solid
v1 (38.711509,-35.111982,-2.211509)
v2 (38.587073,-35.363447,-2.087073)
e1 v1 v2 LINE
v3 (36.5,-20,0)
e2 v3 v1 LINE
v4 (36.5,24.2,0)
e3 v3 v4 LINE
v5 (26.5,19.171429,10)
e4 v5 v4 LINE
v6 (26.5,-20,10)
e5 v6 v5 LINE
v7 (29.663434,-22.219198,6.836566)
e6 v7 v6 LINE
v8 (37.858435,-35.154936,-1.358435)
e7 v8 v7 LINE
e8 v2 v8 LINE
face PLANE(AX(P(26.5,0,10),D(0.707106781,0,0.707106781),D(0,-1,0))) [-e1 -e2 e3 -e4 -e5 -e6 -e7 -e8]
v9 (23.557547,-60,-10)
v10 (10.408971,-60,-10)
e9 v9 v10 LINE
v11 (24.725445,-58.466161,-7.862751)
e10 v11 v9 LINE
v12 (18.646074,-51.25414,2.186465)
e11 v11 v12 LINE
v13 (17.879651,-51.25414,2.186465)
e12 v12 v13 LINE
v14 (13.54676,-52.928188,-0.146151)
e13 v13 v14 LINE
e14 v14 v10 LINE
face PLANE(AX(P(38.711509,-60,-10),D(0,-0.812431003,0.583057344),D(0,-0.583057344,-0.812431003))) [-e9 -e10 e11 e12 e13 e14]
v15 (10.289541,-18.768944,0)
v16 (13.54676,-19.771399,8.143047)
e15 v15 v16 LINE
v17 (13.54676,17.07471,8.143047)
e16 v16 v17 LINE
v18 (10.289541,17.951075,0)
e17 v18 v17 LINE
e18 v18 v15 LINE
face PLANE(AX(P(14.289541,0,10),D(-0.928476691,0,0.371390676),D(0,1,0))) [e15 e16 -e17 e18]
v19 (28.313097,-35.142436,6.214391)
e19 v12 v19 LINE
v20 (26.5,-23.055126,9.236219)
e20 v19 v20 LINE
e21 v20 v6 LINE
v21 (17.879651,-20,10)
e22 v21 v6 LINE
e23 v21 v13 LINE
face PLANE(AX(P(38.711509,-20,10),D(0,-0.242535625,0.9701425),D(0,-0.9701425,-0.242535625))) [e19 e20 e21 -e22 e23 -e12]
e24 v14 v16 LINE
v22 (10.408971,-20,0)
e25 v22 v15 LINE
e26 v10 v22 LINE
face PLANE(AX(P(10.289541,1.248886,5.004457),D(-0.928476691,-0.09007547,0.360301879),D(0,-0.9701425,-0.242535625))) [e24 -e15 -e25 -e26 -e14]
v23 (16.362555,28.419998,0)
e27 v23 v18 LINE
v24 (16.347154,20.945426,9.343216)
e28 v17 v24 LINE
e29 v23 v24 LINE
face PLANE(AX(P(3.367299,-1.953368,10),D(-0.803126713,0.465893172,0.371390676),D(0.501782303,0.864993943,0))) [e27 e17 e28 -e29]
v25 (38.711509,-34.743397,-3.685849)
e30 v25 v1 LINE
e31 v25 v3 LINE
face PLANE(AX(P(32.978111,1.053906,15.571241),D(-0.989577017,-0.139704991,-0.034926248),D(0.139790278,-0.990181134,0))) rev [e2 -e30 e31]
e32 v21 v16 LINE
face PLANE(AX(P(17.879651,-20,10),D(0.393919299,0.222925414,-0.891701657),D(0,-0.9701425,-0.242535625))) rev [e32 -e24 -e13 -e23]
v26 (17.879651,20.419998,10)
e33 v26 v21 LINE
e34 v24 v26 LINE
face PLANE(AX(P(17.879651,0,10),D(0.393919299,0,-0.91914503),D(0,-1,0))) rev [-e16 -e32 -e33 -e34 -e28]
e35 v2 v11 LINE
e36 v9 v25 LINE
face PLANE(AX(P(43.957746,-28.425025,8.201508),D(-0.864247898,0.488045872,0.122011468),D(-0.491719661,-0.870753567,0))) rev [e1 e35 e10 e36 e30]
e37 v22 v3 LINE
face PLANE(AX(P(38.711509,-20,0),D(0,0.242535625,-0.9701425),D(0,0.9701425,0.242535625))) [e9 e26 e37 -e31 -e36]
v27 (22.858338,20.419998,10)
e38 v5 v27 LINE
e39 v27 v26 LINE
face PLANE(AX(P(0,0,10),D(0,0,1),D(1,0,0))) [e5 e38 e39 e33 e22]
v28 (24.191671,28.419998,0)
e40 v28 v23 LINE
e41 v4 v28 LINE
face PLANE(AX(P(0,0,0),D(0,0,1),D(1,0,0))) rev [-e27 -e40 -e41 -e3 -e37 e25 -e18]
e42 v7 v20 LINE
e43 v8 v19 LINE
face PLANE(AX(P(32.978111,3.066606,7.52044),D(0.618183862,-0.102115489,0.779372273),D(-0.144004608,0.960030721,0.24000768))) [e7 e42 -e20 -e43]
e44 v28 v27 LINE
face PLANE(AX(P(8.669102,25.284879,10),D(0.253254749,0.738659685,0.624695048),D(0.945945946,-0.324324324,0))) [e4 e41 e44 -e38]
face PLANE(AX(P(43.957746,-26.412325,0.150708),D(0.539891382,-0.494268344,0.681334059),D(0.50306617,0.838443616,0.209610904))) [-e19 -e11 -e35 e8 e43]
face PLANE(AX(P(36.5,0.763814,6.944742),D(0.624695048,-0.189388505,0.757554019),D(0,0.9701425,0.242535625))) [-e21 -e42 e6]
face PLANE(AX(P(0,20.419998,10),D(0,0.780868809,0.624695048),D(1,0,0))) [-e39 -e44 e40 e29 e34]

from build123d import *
from OCP.BRepFilletAPI import BRepFilletAPI_MakeChamfer

# Parameters (mm, degrees)
BOSS_EXTRUDE1_DEPTH = 10
BOSS_EXTRUDE2_DEPTH = 28.421968
CUT_EXTRUDE1_START  = -9.701425
CUT_EXTRUDE1_DEPTH  = 9.701425
CHAMFER2_SIZE       = 8
CHAMFER2_SIZE_2     = 10
CHAMFER3_START      = 25.809398
CHAMFER3_OUTLINE_W  = 20
CHAMFER3_OUTLINE_H  = 63
CHAMFER3_DEPTH      = 8.190602
CHAMFER4_SIZE       = 10
CHAMFER4_SIZE_2     = 4
CHAMFER5_SIZE       = 3.590067
CHAMFER5_SIZE_2     = 2


with BuildPart() as part:
    # Sketch1 → Boss-Extrude1 (new body)
    with BuildSketch(Plane.XY):
        Polygon((24.191671, 28.419998), (16.362555, 28.419998), (10.289541, 17.951075), (10.289541, -20), (36.5, -20), (36.5, 24.2), align=None)
    extrude(amount=BOSS_EXTRUDE1_DEPTH)

    # Sketch2 → Boss-Extrude2 (add)
    with BuildSketch(Plane.ZY.offset(-10.289541)):
        Polygon((0, -20), (-10, -60), (2.186465, -51.25414), (10, -20), align=None)
    extrude(amount=-BOSS_EXTRUDE2_DEPTH)

    # Cut-Extrude1: read off the stored shape, not the designer's step
    # Cut-Extrude1 outline → Cut-Extrude1 (cut)
    with BuildSketch(Plane(origin=(0, -1.176471, 4.705882), x_dir=(-1, 0, 0), z_dir=(0, 0.24253562503633297, -0.9701425001453319)).offset(CUT_EXTRUDE1_START)):
        Polygon((-38.711509, -34.599995), (-36.5, -19.40285), (-36.5, -11.244925), (-38.711509, -11.244925), align=None)
        Polygon((-23.557547, -60.633906), (-38.711509, -34.599995), (-38.711509, -60.633906), align=None)
    extrude(amount=CUT_EXTRUDE1_DEPTH, mode=Mode.SUBTRACT)

    # Chamfer2
    chamfer2_edges_1 = [part.edges().sort_by_distance(p)[0] for p in [
        (34.464169, -44.175239, 3.95619),
    ]]
    chamfer2_side_1 = [part.faces().sort_by_distance(p)[0] for p in [
        (34.464169, -44.136433, 3.800967),
    ]]
    chamfer2_edges_2 = [part.edges().sort_by_distance(p)[0] for p in [
        (37.605755, -29.724638, 7.56884),
    ]]
    chamfer2_side_2 = [part.faces().sort_by_distance(p)[0] for p in [
        (37.605755, -29.685832, 7.413618),
    ]]
    chamfer2_edges_3 = [part.edges().sort_by_distance(p)[0] for p in [
        (36.5, -21.176471, 9.705882),
    ]]
    chamfer2_side_3 = [part.faces().sort_by_distance(p)[0] for p in [
        (36.5, -21.137665, 9.55066),
    ]]
    chamfer2_edges_4 = [part.edges().sort_by_distance(p)[0] for p in [
        (30.345836, 26.309999, 10),
    ]]
    chamfer2_side_4 = [part.faces().sort_by_distance(p)[0] for p in [
        (30.293944, 26.158648, 10),
    ]]
    chamfer2_edges_5 = [part.edges().sort_by_distance(p)[0] for p in [
        (20.277113, 28.419998, 10),
    ]]
    chamfer2_side_5 = [part.faces().sort_by_distance(p)[0] for p in [
        (20.277113, 28.419998, 9.84),
    ]]
    chamfer2 = BRepFilletAPI_MakeChamfer(part.part.solid().wrapped)
    for e in chamfer2_edges_1:
        chamfer2.Add(CHAMFER2_SIZE - 0.0001, CHAMFER2_SIZE_2 - 0.0001, e.wrapped, chamfer2_side_1[0].wrapped)
    for e in chamfer2_edges_2:
        chamfer2.Add(CHAMFER2_SIZE - 0.0001, CHAMFER2_SIZE_2 - 0.0001, e.wrapped, chamfer2_side_2[0].wrapped)
    for e in chamfer2_edges_3:
        chamfer2.Add(CHAMFER2_SIZE - 0.0001, CHAMFER2_SIZE_2 - 0.0001, e.wrapped, chamfer2_side_3[0].wrapped)
    for e in chamfer2_edges_4:
        chamfer2.Add(CHAMFER2_SIZE - 0.0001, CHAMFER2_SIZE_2 - 0.0001, e.wrapped, chamfer2_side_4[0].wrapped)
    for e in chamfer2_edges_5:
        chamfer2.Add(CHAMFER2_SIZE_2 - 0.0001, CHAMFER2_SIZE - 0.0001, e.wrapped, chamfer2_side_5[0].wrapped)
    add(Compound.cast(chamfer2.Shape()), mode=Mode.REPLACE)  # a hair under: the kernel refuses the full size

    # Chamfer3: read off the stored shape, not the designer's step
    # Chamfer3 outline → Chamfer3 (cut)
    with BuildSketch(Plane(origin=(0, 0, 0), x_dir=(0.7071067811865465, 0, -0.7071067811865487), z_dir=(0.7071067811865486, 0, 0.7071067811865466)).offset(CHAMFER3_START)):
        with Locations((20, -5.5)):
            Rectangle(CHAMFER3_OUTLINE_W, CHAMFER3_OUTLINE_H)
    extrude(amount=CHAMFER3_DEPTH, mode=Mode.SUBTRACT)

    # Chamfer4
    chamfer4_edges_1 = [part.edges().sort_by_distance(p)[0] for p in [
        (10.289541, -35.62707, 6.093233),
    ]]
    chamfer4_side_1 = [part.faces().sort_by_distance(p)[0] for p in [
        (10.289541, -35.607667, 6.015621),
    ]]
    chamfer4_edges_2 = [part.edges().sort_by_distance(p)[0] for p in [
        (10.289541, -1.024463, 10),
    ]]
    chamfer4_side_2 = [part.faces().sort_by_distance(p)[0] for p in [
        (10.369541, -1.024463, 10),
    ]]
    chamfer4_edges_3 = [part.edges().sort_by_distance(p)[0] for p in [
        (11.00568, 19.185587, 10),
    ]]
    chamfer4_side_3 = [part.faces().sort_by_distance(p)[0] for p in [
        (11.00568, 19.185587, 9.92),
    ]]
    chamfer4 = BRepFilletAPI_MakeChamfer(part.part.solid().wrapped)
    for e in chamfer4_edges_1:
        chamfer4.Add(CHAMFER4_SIZE - 0.0001, CHAMFER4_SIZE_2 - 0.0001, e.wrapped, chamfer4_side_1[0].wrapped)
    for e in chamfer4_edges_2:
        chamfer4.Add(CHAMFER4_SIZE_2 - 0.0001, CHAMFER4_SIZE - 0.0001, e.wrapped, chamfer4_side_2[0].wrapped)
    for e in chamfer4_edges_3:
        chamfer4.Add(CHAMFER4_SIZE - 0.0001, CHAMFER4_SIZE_2 - 0.0001, e.wrapped, chamfer4_side_3[0].wrapped)
    add(Compound.cast(chamfer4.Shape()), mode=Mode.REPLACE)  # a hair under: the kernel refuses the full size

    # Chamfer5
    # the kernel refuses this chamfer: 3.590067, 2 mm, written as the material it takes off along each edge
    with BuildSketch(Plane(origin=(14.289441, -60.282499, -0.070625), x_dir=(1, 0, 0), z_dir=(0, 0.9701425001453319, 0.24253562503633294))) as chamfer5_piece_1:
        Polygon((CHAMFER5_SIZE, 0), (-CHAMFER5_SIZE_2 * 0.371385873826, CHAMFER5_SIZE_2 * 0.928478611882), (0, 0), align=None)
    extrude(amount=88.053346, mode=Mode.SUBTRACT)
    with BuildSketch(Plane(origin=(14.289441, 26.181109, 10), x_dir=(1, 0, 0), z_dir=(0, -1, 0))) as chamfer5_piece_2:
        Polygon((CHAMFER5_SIZE, 0), (-CHAMFER5_SIZE_2 * 0.371385873826, -CHAMFER5_SIZE_2 * 0.928478611882), (0, 0), align=None)
    extrude(amount=92.712206, mode=Mode.SUBTRACT)


solid = part.part
